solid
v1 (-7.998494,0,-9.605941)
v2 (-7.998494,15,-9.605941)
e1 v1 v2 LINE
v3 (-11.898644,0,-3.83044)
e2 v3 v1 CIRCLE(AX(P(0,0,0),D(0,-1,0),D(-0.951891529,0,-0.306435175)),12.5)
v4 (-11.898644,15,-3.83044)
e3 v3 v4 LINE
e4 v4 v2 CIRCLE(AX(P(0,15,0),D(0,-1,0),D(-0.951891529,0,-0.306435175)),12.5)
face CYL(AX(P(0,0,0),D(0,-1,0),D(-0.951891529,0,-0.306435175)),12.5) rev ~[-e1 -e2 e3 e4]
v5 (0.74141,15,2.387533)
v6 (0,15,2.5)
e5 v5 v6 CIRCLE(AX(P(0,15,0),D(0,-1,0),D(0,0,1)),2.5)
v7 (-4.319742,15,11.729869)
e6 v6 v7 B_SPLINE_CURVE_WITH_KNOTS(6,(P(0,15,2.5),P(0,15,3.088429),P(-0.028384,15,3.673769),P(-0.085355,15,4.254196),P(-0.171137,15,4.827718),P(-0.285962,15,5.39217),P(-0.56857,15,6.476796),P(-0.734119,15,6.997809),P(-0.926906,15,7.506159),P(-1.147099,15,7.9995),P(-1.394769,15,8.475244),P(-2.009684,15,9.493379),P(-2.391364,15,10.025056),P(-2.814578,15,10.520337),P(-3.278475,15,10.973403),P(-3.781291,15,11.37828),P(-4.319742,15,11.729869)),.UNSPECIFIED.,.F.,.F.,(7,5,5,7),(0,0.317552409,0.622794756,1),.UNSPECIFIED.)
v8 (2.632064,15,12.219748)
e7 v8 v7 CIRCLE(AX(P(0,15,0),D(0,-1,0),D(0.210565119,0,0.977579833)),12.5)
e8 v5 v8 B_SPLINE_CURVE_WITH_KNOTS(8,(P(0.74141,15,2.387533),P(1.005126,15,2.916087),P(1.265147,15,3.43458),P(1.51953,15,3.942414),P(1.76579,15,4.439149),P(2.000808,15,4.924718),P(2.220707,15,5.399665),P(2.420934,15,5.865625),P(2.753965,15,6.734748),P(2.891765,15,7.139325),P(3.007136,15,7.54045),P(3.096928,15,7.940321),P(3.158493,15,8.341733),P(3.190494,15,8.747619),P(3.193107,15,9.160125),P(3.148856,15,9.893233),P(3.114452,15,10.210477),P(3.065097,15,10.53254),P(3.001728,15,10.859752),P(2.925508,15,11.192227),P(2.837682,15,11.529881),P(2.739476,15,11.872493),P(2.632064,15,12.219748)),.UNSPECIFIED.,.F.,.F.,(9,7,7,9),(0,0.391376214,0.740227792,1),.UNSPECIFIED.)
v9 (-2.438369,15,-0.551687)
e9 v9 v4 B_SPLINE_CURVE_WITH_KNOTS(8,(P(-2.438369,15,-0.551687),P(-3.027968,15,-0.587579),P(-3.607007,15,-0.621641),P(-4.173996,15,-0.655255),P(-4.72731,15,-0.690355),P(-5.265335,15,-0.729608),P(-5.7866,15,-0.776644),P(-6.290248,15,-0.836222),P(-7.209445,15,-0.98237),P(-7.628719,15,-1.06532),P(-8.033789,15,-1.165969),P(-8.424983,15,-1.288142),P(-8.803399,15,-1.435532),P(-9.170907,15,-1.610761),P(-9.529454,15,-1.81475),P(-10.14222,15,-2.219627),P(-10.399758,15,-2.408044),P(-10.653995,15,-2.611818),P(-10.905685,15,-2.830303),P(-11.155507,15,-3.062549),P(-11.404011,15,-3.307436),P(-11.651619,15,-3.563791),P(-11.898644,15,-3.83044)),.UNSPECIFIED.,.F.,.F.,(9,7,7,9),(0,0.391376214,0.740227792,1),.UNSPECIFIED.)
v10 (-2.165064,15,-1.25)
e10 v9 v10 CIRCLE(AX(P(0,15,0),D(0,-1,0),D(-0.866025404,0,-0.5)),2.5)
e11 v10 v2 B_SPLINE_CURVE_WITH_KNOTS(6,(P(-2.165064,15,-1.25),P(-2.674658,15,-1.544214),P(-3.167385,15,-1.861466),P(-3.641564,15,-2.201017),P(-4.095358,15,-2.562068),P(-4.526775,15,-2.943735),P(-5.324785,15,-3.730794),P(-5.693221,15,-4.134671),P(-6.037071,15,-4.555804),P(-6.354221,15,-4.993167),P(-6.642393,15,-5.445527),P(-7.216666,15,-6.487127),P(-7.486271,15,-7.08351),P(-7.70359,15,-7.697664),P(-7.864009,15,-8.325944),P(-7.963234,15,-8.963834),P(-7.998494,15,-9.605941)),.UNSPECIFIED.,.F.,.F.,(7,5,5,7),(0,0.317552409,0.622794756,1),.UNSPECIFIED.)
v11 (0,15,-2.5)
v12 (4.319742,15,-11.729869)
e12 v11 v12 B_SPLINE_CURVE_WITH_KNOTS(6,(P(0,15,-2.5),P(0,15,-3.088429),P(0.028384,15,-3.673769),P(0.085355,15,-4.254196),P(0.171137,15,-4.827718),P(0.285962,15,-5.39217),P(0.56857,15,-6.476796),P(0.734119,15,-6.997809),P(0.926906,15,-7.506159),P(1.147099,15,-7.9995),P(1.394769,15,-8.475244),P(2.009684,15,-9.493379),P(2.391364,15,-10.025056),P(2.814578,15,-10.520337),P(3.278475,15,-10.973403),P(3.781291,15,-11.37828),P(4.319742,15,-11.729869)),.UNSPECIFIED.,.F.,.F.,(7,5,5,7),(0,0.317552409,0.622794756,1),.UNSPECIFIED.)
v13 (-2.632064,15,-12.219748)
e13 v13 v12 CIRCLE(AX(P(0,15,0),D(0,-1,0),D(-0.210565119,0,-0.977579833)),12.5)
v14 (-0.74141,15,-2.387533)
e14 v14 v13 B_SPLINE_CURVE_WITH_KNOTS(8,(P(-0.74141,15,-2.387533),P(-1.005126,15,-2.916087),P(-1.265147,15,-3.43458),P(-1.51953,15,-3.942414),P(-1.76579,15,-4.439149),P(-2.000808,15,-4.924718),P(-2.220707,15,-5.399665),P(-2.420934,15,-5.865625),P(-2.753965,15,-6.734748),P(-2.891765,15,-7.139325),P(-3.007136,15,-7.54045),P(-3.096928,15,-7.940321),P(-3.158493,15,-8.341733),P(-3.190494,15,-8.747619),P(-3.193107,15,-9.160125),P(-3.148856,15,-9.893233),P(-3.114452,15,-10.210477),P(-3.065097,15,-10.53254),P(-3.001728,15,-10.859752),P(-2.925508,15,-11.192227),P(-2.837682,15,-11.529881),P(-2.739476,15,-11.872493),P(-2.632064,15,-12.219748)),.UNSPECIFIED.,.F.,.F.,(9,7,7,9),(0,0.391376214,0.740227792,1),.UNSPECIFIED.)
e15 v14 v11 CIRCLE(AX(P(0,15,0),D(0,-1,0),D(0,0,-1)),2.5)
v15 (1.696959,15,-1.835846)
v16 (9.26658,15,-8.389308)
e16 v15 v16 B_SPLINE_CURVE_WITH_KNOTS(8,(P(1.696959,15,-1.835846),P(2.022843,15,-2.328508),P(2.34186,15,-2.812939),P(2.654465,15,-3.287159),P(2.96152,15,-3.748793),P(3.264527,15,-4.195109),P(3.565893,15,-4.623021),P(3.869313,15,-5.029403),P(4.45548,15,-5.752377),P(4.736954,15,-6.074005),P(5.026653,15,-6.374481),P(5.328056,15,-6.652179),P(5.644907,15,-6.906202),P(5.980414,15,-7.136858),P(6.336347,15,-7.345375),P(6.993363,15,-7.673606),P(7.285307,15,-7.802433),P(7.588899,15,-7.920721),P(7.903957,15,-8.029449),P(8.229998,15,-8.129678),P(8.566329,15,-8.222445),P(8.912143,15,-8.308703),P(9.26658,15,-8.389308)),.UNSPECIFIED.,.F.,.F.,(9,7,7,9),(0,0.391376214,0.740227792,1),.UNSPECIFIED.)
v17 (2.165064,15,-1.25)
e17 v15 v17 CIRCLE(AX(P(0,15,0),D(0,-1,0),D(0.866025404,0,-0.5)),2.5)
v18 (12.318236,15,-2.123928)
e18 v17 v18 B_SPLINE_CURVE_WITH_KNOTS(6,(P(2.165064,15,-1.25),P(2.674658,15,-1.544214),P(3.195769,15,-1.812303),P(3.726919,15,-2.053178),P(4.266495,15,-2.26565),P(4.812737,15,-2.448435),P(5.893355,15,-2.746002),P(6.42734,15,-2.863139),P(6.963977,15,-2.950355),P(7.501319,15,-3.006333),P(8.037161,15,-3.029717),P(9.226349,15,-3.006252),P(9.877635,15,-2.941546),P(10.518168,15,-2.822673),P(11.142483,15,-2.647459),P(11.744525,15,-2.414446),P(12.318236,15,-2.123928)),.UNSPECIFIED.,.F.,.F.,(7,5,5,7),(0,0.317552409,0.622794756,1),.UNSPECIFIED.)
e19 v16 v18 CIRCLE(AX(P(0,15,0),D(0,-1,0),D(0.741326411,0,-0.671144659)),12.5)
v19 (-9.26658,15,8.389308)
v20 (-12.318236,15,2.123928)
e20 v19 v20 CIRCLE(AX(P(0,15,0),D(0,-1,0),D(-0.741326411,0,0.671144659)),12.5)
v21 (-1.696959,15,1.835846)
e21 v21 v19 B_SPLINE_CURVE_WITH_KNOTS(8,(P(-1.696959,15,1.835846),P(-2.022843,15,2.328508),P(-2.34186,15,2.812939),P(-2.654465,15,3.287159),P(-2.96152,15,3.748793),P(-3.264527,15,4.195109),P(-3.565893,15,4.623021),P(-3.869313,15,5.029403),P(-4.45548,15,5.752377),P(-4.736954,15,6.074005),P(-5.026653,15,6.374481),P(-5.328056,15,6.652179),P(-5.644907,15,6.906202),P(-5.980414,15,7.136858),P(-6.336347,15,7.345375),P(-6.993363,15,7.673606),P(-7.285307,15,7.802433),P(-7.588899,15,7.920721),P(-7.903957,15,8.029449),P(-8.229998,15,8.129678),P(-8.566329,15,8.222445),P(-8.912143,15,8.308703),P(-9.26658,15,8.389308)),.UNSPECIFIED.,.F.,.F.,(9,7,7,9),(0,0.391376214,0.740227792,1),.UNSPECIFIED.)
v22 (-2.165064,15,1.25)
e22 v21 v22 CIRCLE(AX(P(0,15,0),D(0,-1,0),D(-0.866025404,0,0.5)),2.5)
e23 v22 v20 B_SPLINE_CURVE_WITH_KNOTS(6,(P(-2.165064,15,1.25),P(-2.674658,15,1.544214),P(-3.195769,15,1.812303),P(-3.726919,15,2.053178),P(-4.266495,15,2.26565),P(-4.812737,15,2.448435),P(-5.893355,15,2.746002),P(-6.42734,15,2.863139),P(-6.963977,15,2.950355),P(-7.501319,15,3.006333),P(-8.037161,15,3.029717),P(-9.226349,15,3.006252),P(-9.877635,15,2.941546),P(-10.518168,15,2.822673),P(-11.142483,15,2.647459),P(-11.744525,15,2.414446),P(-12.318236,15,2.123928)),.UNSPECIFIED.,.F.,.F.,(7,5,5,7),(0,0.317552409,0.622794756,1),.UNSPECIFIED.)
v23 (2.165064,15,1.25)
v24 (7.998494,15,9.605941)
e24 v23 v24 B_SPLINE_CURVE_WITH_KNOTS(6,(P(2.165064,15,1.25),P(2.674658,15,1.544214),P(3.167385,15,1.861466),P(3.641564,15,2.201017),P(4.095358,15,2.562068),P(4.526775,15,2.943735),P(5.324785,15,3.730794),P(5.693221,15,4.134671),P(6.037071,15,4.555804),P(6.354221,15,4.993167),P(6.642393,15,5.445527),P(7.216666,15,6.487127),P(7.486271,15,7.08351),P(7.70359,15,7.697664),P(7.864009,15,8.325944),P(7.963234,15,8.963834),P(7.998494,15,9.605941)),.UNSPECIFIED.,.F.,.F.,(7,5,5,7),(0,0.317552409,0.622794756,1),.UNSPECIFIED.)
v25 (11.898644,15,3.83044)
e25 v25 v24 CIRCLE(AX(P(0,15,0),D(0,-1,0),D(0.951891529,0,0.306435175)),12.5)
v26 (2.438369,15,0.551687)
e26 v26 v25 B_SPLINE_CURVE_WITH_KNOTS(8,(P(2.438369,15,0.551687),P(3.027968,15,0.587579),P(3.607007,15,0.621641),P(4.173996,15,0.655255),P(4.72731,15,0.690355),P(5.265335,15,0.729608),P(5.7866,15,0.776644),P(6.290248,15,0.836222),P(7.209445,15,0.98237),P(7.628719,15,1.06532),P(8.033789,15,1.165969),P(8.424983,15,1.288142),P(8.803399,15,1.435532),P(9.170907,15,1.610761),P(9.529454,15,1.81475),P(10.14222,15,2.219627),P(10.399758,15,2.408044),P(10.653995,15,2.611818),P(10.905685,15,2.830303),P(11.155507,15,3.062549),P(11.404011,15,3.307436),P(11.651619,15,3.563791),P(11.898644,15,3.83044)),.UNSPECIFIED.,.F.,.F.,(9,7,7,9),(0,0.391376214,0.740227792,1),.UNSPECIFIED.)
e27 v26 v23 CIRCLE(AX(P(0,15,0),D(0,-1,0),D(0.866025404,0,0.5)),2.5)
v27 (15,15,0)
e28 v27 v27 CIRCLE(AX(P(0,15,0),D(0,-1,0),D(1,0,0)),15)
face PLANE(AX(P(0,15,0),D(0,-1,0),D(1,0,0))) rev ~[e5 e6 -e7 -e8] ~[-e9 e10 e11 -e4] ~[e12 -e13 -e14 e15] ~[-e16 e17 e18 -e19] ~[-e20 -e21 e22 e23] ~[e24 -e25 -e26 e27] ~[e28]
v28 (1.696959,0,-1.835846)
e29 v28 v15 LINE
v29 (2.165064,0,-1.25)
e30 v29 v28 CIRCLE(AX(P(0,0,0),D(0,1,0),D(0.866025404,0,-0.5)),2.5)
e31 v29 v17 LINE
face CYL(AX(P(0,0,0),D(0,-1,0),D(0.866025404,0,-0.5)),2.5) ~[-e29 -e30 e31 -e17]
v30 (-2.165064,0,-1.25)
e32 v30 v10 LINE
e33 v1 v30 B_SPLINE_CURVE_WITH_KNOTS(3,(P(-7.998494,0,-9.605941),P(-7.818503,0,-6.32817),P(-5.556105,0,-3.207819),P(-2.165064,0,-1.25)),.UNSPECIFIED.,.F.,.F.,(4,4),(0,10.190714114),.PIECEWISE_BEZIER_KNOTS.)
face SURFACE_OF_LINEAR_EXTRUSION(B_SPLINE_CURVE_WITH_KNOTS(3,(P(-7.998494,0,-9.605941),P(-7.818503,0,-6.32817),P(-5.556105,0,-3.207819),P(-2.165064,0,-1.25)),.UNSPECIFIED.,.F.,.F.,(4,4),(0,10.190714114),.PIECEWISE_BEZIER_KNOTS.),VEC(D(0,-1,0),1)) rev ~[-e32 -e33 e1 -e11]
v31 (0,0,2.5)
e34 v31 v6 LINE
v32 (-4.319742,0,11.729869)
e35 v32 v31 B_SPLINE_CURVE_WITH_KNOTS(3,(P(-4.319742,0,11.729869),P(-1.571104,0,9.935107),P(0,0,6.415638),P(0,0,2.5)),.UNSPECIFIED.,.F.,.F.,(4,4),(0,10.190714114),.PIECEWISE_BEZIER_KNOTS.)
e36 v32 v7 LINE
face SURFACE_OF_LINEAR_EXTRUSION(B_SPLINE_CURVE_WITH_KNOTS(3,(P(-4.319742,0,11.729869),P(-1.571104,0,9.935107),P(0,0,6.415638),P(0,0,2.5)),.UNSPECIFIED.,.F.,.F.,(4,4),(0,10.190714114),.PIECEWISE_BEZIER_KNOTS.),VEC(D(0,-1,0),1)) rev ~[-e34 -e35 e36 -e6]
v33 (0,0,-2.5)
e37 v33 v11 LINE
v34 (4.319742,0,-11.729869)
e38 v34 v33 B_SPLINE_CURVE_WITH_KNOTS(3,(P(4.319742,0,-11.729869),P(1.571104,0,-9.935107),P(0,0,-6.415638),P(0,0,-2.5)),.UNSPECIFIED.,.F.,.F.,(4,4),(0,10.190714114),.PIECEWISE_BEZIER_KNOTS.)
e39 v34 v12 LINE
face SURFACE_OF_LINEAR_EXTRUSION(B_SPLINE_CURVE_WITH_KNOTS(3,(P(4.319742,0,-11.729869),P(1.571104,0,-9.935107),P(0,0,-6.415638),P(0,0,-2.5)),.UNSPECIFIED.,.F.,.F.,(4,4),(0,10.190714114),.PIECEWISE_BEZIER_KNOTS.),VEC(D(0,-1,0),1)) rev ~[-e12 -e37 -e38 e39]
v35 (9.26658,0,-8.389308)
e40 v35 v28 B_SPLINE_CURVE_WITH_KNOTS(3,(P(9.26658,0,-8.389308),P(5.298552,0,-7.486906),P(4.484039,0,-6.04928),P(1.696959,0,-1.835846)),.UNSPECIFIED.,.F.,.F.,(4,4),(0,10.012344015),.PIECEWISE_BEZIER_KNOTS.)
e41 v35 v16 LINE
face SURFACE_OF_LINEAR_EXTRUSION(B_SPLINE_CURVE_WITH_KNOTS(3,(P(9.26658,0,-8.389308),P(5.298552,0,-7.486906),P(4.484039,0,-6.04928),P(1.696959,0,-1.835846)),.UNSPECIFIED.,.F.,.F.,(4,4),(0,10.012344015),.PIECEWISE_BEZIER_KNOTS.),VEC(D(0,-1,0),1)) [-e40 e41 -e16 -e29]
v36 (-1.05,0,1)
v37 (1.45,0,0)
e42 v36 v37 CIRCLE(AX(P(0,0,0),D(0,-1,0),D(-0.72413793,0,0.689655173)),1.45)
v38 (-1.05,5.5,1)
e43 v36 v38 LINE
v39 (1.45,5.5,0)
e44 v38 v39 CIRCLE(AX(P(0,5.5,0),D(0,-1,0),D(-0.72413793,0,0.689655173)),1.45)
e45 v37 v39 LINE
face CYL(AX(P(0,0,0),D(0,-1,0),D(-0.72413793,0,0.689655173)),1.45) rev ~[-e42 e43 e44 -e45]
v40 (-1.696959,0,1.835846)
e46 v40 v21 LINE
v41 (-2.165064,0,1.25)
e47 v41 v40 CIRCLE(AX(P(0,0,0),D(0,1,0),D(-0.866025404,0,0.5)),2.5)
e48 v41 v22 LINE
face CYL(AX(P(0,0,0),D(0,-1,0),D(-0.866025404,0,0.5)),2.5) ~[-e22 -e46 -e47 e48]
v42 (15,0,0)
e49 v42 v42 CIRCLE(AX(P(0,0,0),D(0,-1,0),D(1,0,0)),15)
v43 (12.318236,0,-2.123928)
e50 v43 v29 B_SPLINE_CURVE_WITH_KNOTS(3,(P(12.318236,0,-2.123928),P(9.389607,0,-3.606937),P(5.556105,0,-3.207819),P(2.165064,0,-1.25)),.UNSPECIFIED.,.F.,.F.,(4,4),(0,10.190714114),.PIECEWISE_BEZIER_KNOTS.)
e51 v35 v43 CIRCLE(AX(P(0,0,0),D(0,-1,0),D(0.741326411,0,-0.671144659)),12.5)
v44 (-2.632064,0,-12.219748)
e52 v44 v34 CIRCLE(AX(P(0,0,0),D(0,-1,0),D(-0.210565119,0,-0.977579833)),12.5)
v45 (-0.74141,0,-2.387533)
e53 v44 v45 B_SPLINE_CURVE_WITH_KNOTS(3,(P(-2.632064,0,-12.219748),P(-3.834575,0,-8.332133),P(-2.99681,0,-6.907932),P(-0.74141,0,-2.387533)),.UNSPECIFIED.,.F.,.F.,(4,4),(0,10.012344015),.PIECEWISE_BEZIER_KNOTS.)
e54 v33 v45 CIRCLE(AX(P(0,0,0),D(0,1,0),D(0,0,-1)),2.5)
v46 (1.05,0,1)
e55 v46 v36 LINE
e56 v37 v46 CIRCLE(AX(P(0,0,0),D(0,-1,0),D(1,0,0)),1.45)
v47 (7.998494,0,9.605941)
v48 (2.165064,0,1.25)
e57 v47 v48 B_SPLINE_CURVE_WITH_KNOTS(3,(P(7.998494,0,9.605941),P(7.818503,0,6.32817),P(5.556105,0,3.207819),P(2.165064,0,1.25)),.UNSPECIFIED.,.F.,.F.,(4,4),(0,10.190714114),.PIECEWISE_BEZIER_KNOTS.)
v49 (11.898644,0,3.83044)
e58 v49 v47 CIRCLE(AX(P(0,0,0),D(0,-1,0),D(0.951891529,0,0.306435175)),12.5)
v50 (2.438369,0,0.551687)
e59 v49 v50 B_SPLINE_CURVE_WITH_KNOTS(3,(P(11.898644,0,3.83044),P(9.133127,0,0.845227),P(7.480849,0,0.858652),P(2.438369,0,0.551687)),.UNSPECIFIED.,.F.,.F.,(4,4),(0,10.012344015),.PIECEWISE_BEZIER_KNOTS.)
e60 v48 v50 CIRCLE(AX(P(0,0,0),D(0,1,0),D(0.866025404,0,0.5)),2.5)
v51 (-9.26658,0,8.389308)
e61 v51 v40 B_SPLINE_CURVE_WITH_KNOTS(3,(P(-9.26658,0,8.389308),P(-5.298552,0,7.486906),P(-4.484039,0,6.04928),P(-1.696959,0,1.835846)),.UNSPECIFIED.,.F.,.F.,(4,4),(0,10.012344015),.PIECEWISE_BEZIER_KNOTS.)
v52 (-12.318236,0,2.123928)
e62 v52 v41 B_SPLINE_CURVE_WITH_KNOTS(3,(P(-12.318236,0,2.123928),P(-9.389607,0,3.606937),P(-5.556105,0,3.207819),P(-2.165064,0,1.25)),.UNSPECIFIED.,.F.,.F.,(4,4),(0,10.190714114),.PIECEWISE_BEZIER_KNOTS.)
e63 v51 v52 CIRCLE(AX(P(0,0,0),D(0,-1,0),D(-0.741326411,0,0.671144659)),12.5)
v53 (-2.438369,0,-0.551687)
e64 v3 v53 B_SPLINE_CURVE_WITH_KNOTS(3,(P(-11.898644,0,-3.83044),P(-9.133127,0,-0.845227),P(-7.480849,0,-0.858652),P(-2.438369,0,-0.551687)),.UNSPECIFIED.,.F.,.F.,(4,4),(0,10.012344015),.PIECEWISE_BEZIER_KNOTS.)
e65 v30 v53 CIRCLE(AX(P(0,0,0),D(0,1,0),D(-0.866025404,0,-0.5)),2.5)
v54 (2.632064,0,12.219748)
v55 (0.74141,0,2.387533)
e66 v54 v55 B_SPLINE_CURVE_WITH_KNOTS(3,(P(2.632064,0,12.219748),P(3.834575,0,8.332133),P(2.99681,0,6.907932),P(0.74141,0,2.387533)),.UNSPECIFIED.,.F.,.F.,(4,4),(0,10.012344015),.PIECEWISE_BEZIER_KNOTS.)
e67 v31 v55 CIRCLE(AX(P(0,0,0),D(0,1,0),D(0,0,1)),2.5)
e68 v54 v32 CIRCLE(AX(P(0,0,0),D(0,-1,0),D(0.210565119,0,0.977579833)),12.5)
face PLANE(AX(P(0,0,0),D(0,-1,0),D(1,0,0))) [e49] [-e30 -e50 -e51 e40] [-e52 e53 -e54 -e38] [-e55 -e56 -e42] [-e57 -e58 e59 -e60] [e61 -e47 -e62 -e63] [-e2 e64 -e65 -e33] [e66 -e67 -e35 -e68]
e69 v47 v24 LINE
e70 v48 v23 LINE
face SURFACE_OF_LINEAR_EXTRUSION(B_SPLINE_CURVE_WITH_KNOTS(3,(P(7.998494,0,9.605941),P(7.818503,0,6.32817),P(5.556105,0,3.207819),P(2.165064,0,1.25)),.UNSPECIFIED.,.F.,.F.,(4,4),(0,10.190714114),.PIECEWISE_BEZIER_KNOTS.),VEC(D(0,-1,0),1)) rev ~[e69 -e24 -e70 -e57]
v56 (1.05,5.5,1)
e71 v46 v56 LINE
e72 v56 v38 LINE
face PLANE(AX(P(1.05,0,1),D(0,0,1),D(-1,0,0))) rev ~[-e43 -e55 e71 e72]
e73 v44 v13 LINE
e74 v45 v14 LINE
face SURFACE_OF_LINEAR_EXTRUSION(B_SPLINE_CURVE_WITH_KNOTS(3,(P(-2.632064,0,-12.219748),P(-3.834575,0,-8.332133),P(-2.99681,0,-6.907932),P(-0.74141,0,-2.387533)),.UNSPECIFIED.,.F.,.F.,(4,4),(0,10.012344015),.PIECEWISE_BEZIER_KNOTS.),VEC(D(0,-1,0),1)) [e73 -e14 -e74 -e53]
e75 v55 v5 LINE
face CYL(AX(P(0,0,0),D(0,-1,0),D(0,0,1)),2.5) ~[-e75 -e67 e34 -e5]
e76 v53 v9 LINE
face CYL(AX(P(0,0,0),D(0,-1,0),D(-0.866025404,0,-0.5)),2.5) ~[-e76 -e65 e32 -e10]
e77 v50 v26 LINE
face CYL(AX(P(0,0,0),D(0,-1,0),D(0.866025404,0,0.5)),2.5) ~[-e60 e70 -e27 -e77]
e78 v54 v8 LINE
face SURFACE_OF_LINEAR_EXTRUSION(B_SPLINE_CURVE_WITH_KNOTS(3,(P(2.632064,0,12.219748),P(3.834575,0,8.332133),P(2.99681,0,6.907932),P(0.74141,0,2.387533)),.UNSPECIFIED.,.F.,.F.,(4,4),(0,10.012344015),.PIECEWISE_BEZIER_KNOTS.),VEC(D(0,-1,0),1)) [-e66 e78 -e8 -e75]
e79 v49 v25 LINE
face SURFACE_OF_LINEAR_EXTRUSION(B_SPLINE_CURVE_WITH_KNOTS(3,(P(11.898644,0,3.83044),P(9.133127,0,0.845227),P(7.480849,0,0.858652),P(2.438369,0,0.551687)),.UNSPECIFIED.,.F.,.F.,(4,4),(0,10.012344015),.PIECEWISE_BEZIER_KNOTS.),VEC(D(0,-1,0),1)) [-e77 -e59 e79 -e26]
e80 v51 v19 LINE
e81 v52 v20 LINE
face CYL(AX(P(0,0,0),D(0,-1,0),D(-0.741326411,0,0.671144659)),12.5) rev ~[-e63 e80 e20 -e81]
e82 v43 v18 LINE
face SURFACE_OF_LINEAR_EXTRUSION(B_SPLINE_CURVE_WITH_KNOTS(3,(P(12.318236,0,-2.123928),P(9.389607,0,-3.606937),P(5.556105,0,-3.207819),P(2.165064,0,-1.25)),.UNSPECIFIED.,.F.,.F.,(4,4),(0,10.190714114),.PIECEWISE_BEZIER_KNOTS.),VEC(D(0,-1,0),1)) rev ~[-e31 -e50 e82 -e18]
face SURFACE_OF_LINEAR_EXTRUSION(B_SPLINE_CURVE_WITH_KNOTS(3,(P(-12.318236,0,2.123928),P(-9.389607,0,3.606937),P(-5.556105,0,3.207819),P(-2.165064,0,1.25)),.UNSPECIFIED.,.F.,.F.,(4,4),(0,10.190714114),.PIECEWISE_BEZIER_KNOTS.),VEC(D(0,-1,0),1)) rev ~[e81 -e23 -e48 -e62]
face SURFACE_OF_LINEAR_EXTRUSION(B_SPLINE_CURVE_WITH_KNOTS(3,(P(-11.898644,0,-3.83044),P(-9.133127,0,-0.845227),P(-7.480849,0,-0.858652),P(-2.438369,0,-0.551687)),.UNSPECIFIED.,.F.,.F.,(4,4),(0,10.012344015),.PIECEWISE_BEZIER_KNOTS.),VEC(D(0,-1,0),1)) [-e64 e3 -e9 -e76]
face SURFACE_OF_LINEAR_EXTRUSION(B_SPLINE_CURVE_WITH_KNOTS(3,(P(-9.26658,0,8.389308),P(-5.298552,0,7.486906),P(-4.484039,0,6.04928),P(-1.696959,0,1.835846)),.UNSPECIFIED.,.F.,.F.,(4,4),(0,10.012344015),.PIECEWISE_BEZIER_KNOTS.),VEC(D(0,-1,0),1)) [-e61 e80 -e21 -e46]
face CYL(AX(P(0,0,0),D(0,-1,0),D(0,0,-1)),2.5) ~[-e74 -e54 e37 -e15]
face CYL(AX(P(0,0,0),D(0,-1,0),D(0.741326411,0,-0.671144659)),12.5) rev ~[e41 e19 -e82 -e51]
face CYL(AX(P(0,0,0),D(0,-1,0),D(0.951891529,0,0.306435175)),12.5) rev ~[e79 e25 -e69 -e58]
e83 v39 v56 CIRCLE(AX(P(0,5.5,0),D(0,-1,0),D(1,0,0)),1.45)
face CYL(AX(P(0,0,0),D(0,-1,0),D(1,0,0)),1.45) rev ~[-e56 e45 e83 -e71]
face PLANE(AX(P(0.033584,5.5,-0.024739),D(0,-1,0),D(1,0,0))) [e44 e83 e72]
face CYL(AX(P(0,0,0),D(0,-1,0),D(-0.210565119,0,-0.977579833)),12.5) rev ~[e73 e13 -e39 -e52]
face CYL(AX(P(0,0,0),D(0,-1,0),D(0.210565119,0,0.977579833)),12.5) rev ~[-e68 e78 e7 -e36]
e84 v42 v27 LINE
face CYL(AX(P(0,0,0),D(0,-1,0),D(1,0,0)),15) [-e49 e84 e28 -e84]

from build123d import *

# Parameters (mm, degrees)
F0_R            = 15
F1_DEPTH        = 15
F3_DEPTH        = 5.5
F5_DEPTH        = 15.001
F5_COPIES_COUNT = 6


# Not quite as in the source:
# - a pattern or mirror of a feature is missing from the dataset's text; its kind, count and spacing are read off the source's solid


with BuildPart() as f1:
    # F0 (on Front) → F1 (new body)
    with BuildSketch(Plane.XZ):
        Circle(F0_R)
    extrude(amount=-F1_DEPTH)

    # F2 (on face) → F3 (cut)
    with BuildSketch(Plane.XZ):
        with BuildLine():
            ThreePointArc((-1.0499999991, 1.000000001), (-0.5385164813, -1.3462912015), (1.45, 0))
            ThreePointArc((1.45, 0), (1.3462912015, 0.5385164813), (1.0499999991, 1.000000001))
            Line((1.0499999991, 1.000000001), (-1.0499999991, 1.000000001))
        make_face()
    extrude(amount=-F3_DEPTH, mode=Mode.SUBTRACT)

    # F4 (on face) → F5 (cut, through all)
    with BuildSketch(Plane.XZ):
        with BuildLine():
            ThreePointArc((2.6320639833, 12.2197479183), (-0.8786691083, 12.4690793805), (-4.3197418021, 11.7298691708))
            add(Edge.make_bspline(
                [(-4.3197418021, 11.7298691708), (-1.5711041633, 9.9351070821), (0, 6.4156376757), (0, 2.5)],
                knots=[0, 0, 0, 0, 10.1907141136, 10.1907141136, 10.1907141136, 10.1907141136], degree=3))
            ThreePointArc((0, 2.5), (0.3749457354, 2.4717232239), (0.7414096655, 2.3875325564))
            add(Edge.make_bspline(
                [(2.6320639833, 12.2197479183), (3.8345751818, 8.3321332932), (2.9968102463, 6.907931529), (0.7414096655, 2.3875325564)],
                knots=[0, 0, 0, 0, 10.0123440149, 10.0123440149, 10.0123440149, 10.0123440149], degree=3))
        make_face()
    f5 = extrude(amount=-F5_DEPTH, mode=Mode.SUBTRACT)

    # F5_copies: F5 ×6 about axis
    f5_copies_axis = Axis((0, 0, 0), (0, 1, 0))
    for i in range(1, F5_COPIES_COUNT):
        add(f5.rotate(f5_copies_axis, i * 360 / F5_COPIES_COUNT), mode=Mode.SUBTRACT)


solid = f1.part
